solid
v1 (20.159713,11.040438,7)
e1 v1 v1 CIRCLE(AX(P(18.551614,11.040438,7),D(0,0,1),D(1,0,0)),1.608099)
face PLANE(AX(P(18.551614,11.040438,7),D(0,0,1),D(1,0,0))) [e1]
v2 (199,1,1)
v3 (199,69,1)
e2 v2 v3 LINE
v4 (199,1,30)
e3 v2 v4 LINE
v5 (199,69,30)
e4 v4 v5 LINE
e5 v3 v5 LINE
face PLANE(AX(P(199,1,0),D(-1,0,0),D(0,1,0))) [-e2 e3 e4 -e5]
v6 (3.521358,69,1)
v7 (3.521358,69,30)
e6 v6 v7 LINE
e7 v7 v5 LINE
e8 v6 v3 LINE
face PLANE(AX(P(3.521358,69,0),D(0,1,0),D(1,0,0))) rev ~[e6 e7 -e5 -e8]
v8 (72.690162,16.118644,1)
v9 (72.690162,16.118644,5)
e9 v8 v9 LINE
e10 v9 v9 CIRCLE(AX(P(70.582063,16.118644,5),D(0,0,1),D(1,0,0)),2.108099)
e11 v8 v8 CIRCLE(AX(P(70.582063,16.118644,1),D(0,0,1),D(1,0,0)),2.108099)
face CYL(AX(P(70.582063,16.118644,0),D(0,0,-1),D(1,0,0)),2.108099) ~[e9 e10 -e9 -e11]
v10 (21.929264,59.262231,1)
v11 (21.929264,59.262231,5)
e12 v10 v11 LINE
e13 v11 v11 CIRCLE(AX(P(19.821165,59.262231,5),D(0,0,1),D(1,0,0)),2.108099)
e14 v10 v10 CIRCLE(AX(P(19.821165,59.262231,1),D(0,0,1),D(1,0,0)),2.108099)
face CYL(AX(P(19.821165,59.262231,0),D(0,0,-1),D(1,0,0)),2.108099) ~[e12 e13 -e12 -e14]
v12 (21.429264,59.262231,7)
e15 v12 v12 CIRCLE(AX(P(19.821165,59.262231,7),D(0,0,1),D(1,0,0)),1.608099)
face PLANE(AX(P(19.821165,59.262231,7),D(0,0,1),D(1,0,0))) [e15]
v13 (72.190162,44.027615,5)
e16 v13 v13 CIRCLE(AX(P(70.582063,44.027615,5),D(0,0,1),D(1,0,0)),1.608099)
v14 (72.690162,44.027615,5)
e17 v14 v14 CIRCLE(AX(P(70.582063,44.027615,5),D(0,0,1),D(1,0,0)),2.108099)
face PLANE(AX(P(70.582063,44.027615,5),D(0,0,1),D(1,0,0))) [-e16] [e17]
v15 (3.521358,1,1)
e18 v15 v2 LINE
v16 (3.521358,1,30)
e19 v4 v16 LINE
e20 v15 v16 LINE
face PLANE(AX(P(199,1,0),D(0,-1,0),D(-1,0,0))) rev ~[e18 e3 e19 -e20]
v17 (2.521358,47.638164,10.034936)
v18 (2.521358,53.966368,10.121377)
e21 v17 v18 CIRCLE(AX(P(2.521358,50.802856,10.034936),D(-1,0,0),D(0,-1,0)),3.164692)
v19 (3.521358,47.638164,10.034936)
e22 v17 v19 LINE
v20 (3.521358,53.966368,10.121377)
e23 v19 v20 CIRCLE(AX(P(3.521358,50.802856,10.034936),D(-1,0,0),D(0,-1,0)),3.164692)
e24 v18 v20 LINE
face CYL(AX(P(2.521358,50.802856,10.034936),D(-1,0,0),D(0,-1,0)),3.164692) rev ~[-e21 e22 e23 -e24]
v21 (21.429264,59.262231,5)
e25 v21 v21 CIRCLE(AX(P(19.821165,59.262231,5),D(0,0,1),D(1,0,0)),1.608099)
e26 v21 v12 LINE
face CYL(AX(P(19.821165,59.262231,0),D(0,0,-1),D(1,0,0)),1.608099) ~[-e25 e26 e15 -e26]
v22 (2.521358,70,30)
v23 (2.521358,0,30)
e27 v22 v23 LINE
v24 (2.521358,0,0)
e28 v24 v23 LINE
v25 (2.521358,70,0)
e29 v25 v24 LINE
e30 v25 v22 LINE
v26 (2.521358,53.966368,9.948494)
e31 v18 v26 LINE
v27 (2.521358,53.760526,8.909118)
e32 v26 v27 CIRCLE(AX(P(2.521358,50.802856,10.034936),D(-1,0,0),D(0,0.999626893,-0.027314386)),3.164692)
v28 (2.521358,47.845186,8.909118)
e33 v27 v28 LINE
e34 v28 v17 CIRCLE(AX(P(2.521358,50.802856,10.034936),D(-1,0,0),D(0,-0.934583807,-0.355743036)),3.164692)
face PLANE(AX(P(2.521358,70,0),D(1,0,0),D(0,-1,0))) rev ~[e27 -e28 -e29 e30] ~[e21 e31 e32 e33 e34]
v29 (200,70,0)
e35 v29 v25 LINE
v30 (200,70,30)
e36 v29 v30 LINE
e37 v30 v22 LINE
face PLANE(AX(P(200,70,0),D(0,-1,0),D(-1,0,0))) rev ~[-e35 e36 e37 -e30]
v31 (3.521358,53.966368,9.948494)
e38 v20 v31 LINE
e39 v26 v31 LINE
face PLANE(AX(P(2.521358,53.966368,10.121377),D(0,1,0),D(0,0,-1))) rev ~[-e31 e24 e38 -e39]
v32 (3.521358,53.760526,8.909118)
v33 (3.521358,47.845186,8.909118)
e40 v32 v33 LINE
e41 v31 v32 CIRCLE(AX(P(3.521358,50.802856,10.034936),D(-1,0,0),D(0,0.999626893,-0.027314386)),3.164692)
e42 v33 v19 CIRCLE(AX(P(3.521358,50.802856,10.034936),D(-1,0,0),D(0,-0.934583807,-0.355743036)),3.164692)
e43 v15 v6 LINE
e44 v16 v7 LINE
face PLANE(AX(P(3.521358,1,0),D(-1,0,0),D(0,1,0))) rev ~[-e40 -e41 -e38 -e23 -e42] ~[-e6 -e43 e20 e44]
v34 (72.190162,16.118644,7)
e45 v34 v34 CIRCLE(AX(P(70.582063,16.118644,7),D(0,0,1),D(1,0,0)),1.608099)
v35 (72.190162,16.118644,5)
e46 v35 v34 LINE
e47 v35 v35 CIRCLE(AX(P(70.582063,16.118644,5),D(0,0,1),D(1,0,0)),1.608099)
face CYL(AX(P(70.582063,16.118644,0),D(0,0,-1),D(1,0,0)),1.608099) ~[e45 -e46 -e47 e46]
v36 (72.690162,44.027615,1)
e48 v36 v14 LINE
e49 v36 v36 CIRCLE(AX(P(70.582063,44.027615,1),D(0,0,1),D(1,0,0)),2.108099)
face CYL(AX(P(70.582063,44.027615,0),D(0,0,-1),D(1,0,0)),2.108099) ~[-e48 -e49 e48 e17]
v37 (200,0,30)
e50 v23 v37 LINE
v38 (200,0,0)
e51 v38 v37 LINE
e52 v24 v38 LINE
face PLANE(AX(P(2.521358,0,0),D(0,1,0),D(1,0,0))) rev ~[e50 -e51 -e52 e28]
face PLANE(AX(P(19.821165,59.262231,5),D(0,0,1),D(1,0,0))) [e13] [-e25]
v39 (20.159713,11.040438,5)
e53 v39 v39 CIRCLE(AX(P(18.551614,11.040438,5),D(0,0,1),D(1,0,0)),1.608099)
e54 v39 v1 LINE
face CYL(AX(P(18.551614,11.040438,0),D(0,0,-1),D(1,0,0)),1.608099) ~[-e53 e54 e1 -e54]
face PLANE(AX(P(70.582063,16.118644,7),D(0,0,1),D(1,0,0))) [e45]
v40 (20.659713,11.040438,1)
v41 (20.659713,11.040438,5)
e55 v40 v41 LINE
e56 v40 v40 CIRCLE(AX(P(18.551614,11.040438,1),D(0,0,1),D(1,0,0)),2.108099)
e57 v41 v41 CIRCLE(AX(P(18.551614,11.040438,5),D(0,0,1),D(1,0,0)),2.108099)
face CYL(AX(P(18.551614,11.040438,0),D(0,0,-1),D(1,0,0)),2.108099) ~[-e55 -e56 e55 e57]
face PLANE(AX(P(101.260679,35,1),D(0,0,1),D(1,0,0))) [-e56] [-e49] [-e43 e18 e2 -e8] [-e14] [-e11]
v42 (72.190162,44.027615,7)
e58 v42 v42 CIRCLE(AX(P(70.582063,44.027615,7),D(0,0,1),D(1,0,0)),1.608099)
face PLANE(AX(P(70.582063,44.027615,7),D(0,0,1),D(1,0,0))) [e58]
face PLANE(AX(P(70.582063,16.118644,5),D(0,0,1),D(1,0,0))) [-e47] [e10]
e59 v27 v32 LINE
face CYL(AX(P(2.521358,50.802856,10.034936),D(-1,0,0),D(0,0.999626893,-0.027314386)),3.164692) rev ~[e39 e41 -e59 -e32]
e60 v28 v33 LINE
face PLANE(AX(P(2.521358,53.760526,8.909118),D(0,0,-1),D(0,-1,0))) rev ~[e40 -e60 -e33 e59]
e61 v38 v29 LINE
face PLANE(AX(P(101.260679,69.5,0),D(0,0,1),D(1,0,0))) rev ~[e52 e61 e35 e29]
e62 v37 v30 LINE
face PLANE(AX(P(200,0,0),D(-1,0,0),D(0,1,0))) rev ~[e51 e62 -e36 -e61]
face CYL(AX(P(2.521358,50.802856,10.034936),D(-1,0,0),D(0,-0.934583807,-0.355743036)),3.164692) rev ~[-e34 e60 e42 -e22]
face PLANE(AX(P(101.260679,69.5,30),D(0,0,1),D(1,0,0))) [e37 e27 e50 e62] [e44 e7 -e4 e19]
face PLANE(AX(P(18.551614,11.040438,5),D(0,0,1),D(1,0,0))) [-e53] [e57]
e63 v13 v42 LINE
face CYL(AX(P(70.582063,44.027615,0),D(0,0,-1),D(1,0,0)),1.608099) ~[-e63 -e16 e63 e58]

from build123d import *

# Parameters (mm, degrees)
F2_W     = 195.4786418714
F2_H     = 68
F2_R     = 2.1080985417
F2_R_2   = 2.1080985448
F2_R_3   = 2.1080987473
F2_R_4   = 2.1080985484
F3_DEPTH = 1
F2_R_5   = 1.6080985484
F2_R_6   = 1.6080987473
F2_R_7   = 1.6080985448
F2_R_8   = 1.6080985417
F4_DEPTH = 5
F5_DEPTH = 7
F2_H_2   = 1
F2_W_2   = 1
F6_DEPTH = 30
F8_DEPTH = 1


with BuildPart() as f3:
    # F2 (on Top) → F3 (new body)
    with BuildSketch(Plane.XY):
        with Locations((101.2606790643, 35)):
            Rectangle(F2_W, F2_H)
        with Locations((18.551614222, 11.0404381331)):
            Circle(F2_R, mode=Mode.SUBTRACT)
        with Locations((70.5820634049, 16.1186437591)):
            Circle(F2_R_2, mode=Mode.SUBTRACT)
        with Locations((70.5820629074, 44.0276153146)):
            Circle(F2_R_3, mode=Mode.SUBTRACT)
        with Locations((19.8211650697, 59.2622312398)):
            Circle(F2_R_4, mode=Mode.SUBTRACT)
    extrude(amount=F3_DEPTH)

    # F2 (on Top) → F4 (join)
    with BuildSketch(Plane.XY):
        with Locations((19.8211650697, 59.2622312398)):
            Circle(F2_R_4)
        with Locations((19.8211650697, 59.2622312398)):
            Circle(F2_R_5, mode=Mode.SUBTRACT)
        with Locations((70.5820629074, 44.0276153146)):
            Circle(F2_R_3)
        with Locations((70.5820629074, 44.0276153146)):
            Circle(F2_R_6, mode=Mode.SUBTRACT)
        with Locations((70.5820634049, 16.1186437591)):
            Circle(F2_R_2)
        with Locations((70.5820634049, 16.1186437591)):
            Circle(F2_R_7, mode=Mode.SUBTRACT)
        with Locations((18.551614222, 11.0404381331)):
            Circle(F2_R)
        with Locations((18.551614222, 11.0404381331)):
            Circle(F2_R_8, mode=Mode.SUBTRACT)
    extrude(amount=F4_DEPTH)

    # F2 (on Top) → F5 (join)
    with BuildSketch(Plane.XY):
        with Locations((19.8211650697, 59.2622312398)):
            Circle(F2_R_5)
        with Locations((70.5820629074, 44.0276153146)):
            Circle(F2_R_6)
        with Locations((70.5820634049, 16.1186437591)):
            Circle(F2_R_7)
        with Locations((18.551614222, 11.0404381331)):
            Circle(F2_R_8)
    extrude(amount=F5_DEPTH)

    # F2 (on Top) → F6 (join)
    with BuildSketch(Plane.XY):
        with Locations((101.2606790643, 69.5)):
            Rectangle(F2_W, F2_H_2)
        with Locations((199.5, 69.5)):
            Rectangle(F2_W_2, F2_H_2)
        Polygon((2.5213581286, 0), (3.5213581286, 0), (3.5213581286, 1), (3.5213581286, 69), (3.5213581286, 70), (2.5213581286, 70), align=None)
        with Locations((101.2606790643, 0.5)):
            Rectangle(F2_W, F2_H_2)
        with Locations((199.5, 0.5)):
            Rectangle(F2_W_2, F2_H_2)
        with Locations((199.5, 35)):
            Rectangle(F2_W_2, F2_H)
    extrude(amount=F6_DEPTH)

    # F7 (on face) → F8 (cut)
    with BuildSketch(Plane(origin=(2.5213581286, 0, 0), x_dir=(0, -1, 0), z_dir=(-1, 0, 0))):
        with BuildLine():
            Line((-53.966367571, 10.121377154), (-53.966367571, 9.9484939128))
            ThreePointArc((-53.966367571, 9.9484939128), (-53.9072548267, 9.4201302724), (-53.760526233, 8.9091183618))
            Line((-53.760526233, 8.9091183618), (-47.8451862662, 8.9091183618))
            ThreePointArc((-47.8451862662, 8.9091183618), (-47.6903499572, 9.4625889476), (-47.638164158, 10.0349355334))
            ThreePointArc((-47.638164158, 10.0349355334), (-50.7596314072, 13.1993324187), (-53.966367571, 10.121377154))
        make_face()
    extrude(amount=-F8_DEPTH, mode=Mode.SUBTRACT)


solid = f3.part
